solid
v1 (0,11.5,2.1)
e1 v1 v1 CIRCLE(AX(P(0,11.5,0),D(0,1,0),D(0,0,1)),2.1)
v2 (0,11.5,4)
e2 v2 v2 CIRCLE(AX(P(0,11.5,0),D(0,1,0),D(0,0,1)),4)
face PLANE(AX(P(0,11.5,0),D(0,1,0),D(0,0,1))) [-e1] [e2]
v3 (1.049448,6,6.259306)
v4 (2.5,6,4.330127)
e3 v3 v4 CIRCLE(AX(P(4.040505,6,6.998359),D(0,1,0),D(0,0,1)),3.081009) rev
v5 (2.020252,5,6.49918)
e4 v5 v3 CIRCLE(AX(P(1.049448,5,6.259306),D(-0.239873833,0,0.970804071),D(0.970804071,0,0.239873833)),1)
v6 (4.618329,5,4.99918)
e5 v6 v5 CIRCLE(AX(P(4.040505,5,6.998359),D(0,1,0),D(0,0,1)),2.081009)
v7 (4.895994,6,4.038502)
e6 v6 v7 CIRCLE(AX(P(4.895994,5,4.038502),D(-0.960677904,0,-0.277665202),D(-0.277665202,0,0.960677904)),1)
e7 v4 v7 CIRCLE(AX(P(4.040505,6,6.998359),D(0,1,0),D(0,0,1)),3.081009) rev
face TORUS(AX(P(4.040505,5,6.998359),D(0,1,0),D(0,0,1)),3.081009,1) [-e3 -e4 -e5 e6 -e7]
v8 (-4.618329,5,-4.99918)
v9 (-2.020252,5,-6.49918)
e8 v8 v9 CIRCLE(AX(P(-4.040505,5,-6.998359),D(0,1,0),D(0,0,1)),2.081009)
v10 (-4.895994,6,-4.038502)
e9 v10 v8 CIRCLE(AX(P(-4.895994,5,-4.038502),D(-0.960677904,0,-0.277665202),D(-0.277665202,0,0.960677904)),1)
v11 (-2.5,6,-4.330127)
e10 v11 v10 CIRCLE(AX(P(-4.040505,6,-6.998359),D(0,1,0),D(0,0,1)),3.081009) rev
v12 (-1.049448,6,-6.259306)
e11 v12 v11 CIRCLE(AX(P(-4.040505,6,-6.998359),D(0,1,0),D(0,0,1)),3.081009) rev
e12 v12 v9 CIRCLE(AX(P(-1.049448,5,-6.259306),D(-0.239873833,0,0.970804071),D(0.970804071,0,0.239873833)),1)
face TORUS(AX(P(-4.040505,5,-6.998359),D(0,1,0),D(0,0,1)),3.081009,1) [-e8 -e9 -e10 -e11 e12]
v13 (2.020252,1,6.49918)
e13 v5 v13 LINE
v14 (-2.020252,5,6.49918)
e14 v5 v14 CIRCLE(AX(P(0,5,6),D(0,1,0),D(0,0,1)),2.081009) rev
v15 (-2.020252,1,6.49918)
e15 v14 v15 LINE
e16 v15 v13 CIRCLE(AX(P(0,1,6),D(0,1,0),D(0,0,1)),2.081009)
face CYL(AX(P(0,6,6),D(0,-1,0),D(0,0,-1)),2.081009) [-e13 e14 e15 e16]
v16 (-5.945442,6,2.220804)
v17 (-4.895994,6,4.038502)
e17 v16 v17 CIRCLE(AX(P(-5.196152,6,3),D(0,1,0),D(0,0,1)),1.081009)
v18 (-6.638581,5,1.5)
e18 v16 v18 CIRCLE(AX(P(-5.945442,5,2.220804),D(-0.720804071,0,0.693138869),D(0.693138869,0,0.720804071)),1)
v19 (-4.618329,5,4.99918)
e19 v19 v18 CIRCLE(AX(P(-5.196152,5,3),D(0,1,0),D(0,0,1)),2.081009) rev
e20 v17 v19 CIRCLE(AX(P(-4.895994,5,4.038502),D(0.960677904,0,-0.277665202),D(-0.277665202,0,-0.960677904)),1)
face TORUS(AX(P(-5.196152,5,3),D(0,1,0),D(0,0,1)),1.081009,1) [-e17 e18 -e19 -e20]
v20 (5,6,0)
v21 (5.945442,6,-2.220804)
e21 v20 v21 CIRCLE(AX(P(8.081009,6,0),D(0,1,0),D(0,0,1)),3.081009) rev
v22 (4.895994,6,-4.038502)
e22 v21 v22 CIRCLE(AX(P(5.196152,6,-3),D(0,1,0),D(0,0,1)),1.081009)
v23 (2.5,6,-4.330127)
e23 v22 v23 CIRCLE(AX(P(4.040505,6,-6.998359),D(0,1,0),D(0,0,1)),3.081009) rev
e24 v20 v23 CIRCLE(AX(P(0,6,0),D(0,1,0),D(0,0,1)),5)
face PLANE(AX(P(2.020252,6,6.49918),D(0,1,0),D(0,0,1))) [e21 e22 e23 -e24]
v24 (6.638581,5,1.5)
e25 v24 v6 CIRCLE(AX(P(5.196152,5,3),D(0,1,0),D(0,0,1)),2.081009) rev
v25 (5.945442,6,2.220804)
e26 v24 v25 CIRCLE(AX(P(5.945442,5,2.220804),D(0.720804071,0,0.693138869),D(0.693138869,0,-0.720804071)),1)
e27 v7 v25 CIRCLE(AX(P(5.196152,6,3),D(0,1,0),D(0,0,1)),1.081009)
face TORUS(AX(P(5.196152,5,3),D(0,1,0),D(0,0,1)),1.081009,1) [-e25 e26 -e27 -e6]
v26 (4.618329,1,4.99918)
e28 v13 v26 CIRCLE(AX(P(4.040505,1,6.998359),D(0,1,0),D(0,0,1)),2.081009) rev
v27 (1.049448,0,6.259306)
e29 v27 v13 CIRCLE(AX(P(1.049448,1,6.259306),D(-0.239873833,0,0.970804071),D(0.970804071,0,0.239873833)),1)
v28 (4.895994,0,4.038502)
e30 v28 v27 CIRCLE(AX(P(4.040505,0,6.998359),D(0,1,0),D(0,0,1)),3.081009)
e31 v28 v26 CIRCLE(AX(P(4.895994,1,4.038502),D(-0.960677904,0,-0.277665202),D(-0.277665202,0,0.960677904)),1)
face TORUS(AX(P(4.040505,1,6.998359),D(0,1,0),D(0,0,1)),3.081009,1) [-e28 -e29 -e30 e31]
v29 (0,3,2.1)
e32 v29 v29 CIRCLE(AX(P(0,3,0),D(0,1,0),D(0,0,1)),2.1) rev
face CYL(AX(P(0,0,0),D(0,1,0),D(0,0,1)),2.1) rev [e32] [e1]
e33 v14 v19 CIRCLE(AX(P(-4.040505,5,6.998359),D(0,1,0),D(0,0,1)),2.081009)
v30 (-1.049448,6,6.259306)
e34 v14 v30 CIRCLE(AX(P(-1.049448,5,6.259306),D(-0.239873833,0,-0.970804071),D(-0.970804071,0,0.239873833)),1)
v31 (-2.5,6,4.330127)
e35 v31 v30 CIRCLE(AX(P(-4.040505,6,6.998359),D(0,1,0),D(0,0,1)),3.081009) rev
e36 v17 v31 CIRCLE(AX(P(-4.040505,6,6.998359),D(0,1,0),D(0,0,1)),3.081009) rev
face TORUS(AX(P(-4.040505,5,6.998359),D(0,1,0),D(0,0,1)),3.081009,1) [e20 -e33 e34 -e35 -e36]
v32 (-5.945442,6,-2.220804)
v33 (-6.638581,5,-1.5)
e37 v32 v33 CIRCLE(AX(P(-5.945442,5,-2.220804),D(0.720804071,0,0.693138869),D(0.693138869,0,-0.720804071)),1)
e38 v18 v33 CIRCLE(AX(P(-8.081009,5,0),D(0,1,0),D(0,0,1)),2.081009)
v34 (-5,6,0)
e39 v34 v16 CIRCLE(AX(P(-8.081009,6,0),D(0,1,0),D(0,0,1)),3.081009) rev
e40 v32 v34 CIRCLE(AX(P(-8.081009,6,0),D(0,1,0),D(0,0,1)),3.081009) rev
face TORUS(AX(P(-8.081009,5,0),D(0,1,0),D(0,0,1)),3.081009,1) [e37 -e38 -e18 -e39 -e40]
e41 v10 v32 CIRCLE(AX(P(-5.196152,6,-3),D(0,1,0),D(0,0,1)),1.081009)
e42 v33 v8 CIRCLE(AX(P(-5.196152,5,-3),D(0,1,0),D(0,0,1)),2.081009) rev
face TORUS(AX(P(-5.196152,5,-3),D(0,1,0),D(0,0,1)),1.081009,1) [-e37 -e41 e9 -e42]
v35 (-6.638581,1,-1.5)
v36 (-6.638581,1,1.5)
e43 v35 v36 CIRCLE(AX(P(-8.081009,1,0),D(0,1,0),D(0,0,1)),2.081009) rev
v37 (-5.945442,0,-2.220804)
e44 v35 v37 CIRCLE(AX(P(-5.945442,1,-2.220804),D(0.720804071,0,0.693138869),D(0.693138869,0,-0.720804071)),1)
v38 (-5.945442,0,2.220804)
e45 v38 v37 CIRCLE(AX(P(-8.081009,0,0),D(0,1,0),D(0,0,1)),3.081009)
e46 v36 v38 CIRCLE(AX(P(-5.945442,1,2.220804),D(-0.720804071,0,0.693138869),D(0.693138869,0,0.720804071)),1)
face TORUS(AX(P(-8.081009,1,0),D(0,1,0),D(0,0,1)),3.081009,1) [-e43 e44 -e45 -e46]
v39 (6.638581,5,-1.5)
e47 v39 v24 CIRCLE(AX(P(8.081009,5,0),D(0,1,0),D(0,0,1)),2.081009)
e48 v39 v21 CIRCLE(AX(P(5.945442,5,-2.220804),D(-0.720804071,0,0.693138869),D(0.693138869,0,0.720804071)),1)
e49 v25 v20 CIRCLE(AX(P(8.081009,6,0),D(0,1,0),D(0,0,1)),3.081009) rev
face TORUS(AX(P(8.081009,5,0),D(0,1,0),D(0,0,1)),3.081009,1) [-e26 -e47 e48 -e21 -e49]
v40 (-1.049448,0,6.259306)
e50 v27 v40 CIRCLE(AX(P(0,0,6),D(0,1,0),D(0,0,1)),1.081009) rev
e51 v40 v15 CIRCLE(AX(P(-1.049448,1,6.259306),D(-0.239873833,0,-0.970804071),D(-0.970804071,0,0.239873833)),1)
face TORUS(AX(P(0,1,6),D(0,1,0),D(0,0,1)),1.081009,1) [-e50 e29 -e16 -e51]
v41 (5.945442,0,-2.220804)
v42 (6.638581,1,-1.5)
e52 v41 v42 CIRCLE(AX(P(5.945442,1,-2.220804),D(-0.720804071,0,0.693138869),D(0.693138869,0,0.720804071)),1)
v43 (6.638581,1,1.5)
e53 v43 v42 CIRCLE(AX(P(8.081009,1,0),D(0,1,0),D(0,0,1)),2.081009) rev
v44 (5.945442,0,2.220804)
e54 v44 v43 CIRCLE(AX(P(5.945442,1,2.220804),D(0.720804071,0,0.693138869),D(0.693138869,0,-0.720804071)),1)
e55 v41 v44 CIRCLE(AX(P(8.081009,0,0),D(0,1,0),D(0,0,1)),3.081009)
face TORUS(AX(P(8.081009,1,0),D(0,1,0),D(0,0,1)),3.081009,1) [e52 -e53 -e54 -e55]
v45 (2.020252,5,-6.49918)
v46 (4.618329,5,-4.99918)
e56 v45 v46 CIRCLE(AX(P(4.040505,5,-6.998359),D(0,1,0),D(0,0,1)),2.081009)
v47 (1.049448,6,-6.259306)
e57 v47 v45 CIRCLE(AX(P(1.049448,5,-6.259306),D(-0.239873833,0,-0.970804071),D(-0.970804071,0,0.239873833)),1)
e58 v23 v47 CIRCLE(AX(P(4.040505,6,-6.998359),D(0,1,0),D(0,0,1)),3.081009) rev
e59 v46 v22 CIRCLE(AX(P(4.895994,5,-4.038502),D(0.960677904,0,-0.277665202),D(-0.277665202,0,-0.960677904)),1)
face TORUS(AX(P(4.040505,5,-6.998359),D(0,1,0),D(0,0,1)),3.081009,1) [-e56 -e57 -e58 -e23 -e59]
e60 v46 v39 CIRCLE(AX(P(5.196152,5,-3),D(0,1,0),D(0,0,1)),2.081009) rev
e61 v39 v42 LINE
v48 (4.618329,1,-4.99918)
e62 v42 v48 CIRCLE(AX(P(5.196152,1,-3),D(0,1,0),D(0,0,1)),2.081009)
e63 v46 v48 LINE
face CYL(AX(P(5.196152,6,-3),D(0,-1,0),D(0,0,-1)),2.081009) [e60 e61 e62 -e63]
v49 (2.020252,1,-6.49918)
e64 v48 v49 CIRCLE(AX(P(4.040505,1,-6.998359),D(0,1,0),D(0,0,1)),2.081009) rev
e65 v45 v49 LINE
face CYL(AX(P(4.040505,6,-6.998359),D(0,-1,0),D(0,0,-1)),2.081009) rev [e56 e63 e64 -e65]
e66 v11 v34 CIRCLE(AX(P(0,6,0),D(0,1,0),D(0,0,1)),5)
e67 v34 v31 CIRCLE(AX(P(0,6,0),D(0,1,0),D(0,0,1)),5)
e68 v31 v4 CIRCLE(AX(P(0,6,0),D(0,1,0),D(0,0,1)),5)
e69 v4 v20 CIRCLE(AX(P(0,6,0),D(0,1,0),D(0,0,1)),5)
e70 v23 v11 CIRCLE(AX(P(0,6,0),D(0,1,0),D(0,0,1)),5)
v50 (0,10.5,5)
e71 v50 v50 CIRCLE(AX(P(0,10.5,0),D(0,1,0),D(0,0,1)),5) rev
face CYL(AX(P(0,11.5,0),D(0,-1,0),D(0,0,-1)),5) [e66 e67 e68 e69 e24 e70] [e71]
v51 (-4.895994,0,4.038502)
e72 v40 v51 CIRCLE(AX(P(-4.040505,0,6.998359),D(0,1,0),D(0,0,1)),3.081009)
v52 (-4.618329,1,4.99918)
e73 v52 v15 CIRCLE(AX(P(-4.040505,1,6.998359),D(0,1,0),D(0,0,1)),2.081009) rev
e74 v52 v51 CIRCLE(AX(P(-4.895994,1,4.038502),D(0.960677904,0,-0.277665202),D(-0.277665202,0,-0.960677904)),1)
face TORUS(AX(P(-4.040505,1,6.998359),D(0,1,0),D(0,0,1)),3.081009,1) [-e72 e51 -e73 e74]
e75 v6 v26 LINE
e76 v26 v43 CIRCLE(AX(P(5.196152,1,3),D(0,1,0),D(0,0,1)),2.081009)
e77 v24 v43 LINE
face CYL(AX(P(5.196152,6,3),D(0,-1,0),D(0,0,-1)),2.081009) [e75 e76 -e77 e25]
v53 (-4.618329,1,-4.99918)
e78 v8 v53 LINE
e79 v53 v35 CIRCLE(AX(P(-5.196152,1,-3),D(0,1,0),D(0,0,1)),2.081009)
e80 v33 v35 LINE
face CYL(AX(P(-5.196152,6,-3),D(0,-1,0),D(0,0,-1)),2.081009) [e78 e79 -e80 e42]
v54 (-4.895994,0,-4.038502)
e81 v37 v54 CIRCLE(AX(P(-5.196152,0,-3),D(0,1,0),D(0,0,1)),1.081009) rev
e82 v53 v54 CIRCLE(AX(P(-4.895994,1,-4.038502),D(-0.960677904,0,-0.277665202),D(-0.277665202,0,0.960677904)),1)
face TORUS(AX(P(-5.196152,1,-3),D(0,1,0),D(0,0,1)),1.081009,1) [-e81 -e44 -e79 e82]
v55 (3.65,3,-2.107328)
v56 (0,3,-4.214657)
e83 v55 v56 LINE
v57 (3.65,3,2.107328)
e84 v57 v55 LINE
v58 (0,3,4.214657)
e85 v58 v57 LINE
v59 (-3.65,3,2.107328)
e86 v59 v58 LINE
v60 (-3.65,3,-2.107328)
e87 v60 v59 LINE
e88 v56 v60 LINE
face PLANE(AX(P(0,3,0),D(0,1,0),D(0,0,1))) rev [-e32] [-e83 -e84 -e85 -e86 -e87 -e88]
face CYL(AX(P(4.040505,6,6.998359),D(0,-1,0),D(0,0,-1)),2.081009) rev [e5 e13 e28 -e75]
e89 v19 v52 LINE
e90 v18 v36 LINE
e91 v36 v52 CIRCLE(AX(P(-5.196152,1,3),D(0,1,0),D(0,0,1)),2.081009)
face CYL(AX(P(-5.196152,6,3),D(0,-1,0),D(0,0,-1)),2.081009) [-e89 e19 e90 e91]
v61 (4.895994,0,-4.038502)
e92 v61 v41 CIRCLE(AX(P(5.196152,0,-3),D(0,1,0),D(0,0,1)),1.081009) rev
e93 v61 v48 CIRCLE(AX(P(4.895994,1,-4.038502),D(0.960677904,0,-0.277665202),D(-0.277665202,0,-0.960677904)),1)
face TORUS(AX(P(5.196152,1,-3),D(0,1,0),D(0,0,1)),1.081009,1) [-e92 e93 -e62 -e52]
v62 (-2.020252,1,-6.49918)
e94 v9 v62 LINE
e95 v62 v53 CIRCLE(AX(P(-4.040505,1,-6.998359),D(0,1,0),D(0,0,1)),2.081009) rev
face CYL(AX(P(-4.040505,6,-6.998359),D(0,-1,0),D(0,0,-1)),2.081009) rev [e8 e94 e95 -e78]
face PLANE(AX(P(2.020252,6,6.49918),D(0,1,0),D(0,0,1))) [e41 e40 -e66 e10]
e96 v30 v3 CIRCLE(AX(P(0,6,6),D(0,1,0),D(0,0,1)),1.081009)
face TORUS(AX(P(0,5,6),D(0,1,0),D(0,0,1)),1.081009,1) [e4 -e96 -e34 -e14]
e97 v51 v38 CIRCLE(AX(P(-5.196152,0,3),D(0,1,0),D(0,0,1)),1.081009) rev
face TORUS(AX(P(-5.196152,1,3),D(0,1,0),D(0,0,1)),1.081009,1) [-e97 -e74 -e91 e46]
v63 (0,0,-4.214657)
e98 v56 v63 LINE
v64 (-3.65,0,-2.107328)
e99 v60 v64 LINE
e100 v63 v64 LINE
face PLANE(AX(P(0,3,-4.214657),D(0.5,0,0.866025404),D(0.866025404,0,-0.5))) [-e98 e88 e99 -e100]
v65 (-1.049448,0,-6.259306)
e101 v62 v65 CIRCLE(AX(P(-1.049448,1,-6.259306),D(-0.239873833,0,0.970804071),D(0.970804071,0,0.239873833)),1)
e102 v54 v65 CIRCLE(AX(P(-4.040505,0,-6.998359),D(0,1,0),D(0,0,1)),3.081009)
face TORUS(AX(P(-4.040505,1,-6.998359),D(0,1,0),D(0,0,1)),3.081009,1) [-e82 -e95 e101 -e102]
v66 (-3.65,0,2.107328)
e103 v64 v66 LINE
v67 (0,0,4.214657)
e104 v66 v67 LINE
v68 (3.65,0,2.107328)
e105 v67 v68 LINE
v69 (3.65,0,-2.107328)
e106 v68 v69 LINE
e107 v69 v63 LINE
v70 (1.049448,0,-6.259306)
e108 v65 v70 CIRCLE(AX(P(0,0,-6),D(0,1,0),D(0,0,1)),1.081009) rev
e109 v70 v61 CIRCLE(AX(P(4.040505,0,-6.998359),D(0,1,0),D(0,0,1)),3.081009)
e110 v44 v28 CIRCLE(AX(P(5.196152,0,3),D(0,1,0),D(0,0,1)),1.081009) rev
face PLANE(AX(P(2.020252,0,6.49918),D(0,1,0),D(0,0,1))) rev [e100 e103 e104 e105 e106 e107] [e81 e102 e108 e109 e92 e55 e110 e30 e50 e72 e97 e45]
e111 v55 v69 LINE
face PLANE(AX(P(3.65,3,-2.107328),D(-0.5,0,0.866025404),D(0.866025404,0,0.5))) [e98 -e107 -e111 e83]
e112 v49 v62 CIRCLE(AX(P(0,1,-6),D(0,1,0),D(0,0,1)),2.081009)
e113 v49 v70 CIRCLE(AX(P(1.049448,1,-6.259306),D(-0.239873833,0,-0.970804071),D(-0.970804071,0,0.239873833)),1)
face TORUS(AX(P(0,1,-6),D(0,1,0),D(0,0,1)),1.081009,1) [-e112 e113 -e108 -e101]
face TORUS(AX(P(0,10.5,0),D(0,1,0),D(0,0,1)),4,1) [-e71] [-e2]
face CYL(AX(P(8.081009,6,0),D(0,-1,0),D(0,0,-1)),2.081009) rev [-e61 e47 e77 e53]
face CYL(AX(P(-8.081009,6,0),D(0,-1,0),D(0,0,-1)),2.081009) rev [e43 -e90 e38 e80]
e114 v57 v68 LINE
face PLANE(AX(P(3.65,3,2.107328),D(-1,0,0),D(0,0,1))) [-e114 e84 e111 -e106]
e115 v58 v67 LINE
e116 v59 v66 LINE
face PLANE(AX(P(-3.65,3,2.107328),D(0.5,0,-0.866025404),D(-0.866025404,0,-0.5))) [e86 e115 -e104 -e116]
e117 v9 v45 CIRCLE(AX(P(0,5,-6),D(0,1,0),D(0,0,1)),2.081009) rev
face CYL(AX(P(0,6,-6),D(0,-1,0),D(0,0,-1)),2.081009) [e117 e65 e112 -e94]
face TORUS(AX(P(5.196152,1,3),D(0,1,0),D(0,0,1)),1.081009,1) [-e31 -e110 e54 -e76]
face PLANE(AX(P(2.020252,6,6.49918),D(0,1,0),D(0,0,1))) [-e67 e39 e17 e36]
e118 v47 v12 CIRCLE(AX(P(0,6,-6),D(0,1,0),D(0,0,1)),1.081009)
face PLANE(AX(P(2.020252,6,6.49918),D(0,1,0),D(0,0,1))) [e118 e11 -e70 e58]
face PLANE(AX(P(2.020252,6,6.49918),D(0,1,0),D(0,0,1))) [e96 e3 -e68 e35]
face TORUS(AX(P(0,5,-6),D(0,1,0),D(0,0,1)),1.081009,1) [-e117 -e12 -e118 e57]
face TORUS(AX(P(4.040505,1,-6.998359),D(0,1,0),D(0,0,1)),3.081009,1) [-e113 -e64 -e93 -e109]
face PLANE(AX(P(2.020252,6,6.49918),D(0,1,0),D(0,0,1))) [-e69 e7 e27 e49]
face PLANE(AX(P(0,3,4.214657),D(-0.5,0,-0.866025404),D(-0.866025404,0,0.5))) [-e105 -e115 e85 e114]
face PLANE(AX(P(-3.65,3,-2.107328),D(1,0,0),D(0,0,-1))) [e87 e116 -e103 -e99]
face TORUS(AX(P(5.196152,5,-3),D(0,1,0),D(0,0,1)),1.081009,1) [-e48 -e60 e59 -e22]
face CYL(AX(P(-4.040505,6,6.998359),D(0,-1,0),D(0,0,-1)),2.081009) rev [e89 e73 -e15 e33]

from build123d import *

# Parameters (mm, degrees)
EXTRUDE_1_DEPTH     = 6
SKETCH_2_R          = 5
EXTRUDE_2_DEPTH     = 5.5
SKETCH_3_R          = 2.1
CUT_EXTRUDE_1_DEPTH = 16.827501227
CUT_EXTRUDE_2_DEPTH = 3
FILLET_1_R          = 1


with BuildPart() as part:
    # Эскиз1 → Бобышка-Вытянуть1 (new body)
    with BuildSketch(Plane(origin=(0, 0, 0), x_dir=(1, 0, 0), z_dir=(0, 1, 0))):
        with BuildLine():
            ThreePointArc((2.020252334, 6.499179686), (0, 8.081009335), (-2.020252334, 6.499179686))
            ThreePointArc((-2.020252334, 6.499179686), (-3, 5.196152423), (-4.618328545, 4.999179686))
            ThreePointArc((-4.618328545, 4.999179686), (-6.998359372, 4.040504667), (-6.638580879, 1.5))
            ThreePointArc((-6.638580879, 1.5), (-6, 0), (-6.638580879, -1.5))
            ThreePointArc((-6.638580879, -1.5), (-6.998359372, -4.040504667), (-4.618328545, -4.999179686))
            ThreePointArc((-4.618328545, -4.999179686), (-3, -5.196152423), (-2.020252334, -6.499179686))
            ThreePointArc((-2.020252334, -6.499179686), (0, -8.081009335), (2.020252334, -6.499179686))
            ThreePointArc((2.020252334, -6.499179686), (3, -5.196152423), (4.618328545, -4.999179686))
            ThreePointArc((4.618328545, -4.999179686), (6.998359372, -4.040504667), (6.638580879, -1.5))
            ThreePointArc((6.638580879, -1.5), (6, 0), (6.638580879, 1.5))
            ThreePointArc((6.638580879, 1.5), (6.998359372, 4.040504667), (4.618328545, 4.999179686))
            ThreePointArc((4.618328545, 4.999179686), (3, 5.196152423), (2.020252334, 6.499179686))
        make_face()
    extrude(amount=EXTRUDE_1_DEPTH)

    # Эскиз2 → Бобышка-Вытянуть2 (add)
    with BuildSketch(Plane(origin=(0, 6, 0), x_dir=(1, 0, 0), z_dir=(0, 1, 0))):
        with Locations(Location((0, 0, 0), (0, 0, 270))):
            Circle(SKETCH_2_R)
    extrude(amount=EXTRUDE_2_DEPTH)

    # Эскиз3 → Вырез-Вытянуть1 (cut, through all)
    with BuildSketch(Plane(origin=(0, 11.5, 0), x_dir=(1, 0, 0), z_dir=(0, 1, 0))):
        with Locations(Location((0, 0, 0), (0, 0, 270))):
            Circle(SKETCH_3_R)
    extrude(amount=-CUT_EXTRUDE_1_DEPTH, mode=Mode.SUBTRACT)

    # Эскиз1<3> → Вырез-Вытянуть2 (cut)
    with BuildSketch(Plane(origin=(0, 0, 0), x_dir=(1, 0, 0), z_dir=(0, 1, 0))):
        Polygon((0, 4.214656965), (-3.65, 2.107328483), (-3.65, -2.107328483), (0, -4.214656965), (3.65, -2.107328483), (3.65, 2.107328483), align=None)
    extrude(amount=CUT_EXTRUDE_2_DEPTH, mode=Mode.SUBTRACT)

    # Скругление1
    fillet_1_edges = [part.edges().sort_by_distance(p)[0] for p in [
        (-3, 6, 5.196152423),
        (6.998359372, 0, 4.040504667),
        (6, 0, 0),
        (6.998359372, 0, -4.040504667),
        (3, 0, -5.196152423),
        (0, 0, -8.081009335),
        (-3, 0, -5.196152423),
        (-6.998359372, 6, 4.040504667),
        (-6.998359372, 0, -4.040504667),
        (-6, 0, 0),
        (-6.998359372, 0, 4.040504667),
        (-3, 0, 5.196152423),
        (0, 0, 8.081009335),
        (3, 0, 5.196152423),
        (-6, 6, 0),
        (-6.998359372, 6, -4.040504667),
        (-3, 6, -5.196152423),
        (0, 6, -8.081009335),
        (3, 6, -5.196152423),
        (6.998359372, 6, -4.040504667),
        (6, 6, 0),
        (0, 11.5, -5),
        (6.998359372, 6, 4.040504667),
        (3, 6, 5.196152423),
        (0, 6, 8.081009335),
    ]]
    fillet(fillet_1_edges, radius=FILLET_1_R - 0.0001)  # a hair under: the kernel refuses the full size


solid = part.part
